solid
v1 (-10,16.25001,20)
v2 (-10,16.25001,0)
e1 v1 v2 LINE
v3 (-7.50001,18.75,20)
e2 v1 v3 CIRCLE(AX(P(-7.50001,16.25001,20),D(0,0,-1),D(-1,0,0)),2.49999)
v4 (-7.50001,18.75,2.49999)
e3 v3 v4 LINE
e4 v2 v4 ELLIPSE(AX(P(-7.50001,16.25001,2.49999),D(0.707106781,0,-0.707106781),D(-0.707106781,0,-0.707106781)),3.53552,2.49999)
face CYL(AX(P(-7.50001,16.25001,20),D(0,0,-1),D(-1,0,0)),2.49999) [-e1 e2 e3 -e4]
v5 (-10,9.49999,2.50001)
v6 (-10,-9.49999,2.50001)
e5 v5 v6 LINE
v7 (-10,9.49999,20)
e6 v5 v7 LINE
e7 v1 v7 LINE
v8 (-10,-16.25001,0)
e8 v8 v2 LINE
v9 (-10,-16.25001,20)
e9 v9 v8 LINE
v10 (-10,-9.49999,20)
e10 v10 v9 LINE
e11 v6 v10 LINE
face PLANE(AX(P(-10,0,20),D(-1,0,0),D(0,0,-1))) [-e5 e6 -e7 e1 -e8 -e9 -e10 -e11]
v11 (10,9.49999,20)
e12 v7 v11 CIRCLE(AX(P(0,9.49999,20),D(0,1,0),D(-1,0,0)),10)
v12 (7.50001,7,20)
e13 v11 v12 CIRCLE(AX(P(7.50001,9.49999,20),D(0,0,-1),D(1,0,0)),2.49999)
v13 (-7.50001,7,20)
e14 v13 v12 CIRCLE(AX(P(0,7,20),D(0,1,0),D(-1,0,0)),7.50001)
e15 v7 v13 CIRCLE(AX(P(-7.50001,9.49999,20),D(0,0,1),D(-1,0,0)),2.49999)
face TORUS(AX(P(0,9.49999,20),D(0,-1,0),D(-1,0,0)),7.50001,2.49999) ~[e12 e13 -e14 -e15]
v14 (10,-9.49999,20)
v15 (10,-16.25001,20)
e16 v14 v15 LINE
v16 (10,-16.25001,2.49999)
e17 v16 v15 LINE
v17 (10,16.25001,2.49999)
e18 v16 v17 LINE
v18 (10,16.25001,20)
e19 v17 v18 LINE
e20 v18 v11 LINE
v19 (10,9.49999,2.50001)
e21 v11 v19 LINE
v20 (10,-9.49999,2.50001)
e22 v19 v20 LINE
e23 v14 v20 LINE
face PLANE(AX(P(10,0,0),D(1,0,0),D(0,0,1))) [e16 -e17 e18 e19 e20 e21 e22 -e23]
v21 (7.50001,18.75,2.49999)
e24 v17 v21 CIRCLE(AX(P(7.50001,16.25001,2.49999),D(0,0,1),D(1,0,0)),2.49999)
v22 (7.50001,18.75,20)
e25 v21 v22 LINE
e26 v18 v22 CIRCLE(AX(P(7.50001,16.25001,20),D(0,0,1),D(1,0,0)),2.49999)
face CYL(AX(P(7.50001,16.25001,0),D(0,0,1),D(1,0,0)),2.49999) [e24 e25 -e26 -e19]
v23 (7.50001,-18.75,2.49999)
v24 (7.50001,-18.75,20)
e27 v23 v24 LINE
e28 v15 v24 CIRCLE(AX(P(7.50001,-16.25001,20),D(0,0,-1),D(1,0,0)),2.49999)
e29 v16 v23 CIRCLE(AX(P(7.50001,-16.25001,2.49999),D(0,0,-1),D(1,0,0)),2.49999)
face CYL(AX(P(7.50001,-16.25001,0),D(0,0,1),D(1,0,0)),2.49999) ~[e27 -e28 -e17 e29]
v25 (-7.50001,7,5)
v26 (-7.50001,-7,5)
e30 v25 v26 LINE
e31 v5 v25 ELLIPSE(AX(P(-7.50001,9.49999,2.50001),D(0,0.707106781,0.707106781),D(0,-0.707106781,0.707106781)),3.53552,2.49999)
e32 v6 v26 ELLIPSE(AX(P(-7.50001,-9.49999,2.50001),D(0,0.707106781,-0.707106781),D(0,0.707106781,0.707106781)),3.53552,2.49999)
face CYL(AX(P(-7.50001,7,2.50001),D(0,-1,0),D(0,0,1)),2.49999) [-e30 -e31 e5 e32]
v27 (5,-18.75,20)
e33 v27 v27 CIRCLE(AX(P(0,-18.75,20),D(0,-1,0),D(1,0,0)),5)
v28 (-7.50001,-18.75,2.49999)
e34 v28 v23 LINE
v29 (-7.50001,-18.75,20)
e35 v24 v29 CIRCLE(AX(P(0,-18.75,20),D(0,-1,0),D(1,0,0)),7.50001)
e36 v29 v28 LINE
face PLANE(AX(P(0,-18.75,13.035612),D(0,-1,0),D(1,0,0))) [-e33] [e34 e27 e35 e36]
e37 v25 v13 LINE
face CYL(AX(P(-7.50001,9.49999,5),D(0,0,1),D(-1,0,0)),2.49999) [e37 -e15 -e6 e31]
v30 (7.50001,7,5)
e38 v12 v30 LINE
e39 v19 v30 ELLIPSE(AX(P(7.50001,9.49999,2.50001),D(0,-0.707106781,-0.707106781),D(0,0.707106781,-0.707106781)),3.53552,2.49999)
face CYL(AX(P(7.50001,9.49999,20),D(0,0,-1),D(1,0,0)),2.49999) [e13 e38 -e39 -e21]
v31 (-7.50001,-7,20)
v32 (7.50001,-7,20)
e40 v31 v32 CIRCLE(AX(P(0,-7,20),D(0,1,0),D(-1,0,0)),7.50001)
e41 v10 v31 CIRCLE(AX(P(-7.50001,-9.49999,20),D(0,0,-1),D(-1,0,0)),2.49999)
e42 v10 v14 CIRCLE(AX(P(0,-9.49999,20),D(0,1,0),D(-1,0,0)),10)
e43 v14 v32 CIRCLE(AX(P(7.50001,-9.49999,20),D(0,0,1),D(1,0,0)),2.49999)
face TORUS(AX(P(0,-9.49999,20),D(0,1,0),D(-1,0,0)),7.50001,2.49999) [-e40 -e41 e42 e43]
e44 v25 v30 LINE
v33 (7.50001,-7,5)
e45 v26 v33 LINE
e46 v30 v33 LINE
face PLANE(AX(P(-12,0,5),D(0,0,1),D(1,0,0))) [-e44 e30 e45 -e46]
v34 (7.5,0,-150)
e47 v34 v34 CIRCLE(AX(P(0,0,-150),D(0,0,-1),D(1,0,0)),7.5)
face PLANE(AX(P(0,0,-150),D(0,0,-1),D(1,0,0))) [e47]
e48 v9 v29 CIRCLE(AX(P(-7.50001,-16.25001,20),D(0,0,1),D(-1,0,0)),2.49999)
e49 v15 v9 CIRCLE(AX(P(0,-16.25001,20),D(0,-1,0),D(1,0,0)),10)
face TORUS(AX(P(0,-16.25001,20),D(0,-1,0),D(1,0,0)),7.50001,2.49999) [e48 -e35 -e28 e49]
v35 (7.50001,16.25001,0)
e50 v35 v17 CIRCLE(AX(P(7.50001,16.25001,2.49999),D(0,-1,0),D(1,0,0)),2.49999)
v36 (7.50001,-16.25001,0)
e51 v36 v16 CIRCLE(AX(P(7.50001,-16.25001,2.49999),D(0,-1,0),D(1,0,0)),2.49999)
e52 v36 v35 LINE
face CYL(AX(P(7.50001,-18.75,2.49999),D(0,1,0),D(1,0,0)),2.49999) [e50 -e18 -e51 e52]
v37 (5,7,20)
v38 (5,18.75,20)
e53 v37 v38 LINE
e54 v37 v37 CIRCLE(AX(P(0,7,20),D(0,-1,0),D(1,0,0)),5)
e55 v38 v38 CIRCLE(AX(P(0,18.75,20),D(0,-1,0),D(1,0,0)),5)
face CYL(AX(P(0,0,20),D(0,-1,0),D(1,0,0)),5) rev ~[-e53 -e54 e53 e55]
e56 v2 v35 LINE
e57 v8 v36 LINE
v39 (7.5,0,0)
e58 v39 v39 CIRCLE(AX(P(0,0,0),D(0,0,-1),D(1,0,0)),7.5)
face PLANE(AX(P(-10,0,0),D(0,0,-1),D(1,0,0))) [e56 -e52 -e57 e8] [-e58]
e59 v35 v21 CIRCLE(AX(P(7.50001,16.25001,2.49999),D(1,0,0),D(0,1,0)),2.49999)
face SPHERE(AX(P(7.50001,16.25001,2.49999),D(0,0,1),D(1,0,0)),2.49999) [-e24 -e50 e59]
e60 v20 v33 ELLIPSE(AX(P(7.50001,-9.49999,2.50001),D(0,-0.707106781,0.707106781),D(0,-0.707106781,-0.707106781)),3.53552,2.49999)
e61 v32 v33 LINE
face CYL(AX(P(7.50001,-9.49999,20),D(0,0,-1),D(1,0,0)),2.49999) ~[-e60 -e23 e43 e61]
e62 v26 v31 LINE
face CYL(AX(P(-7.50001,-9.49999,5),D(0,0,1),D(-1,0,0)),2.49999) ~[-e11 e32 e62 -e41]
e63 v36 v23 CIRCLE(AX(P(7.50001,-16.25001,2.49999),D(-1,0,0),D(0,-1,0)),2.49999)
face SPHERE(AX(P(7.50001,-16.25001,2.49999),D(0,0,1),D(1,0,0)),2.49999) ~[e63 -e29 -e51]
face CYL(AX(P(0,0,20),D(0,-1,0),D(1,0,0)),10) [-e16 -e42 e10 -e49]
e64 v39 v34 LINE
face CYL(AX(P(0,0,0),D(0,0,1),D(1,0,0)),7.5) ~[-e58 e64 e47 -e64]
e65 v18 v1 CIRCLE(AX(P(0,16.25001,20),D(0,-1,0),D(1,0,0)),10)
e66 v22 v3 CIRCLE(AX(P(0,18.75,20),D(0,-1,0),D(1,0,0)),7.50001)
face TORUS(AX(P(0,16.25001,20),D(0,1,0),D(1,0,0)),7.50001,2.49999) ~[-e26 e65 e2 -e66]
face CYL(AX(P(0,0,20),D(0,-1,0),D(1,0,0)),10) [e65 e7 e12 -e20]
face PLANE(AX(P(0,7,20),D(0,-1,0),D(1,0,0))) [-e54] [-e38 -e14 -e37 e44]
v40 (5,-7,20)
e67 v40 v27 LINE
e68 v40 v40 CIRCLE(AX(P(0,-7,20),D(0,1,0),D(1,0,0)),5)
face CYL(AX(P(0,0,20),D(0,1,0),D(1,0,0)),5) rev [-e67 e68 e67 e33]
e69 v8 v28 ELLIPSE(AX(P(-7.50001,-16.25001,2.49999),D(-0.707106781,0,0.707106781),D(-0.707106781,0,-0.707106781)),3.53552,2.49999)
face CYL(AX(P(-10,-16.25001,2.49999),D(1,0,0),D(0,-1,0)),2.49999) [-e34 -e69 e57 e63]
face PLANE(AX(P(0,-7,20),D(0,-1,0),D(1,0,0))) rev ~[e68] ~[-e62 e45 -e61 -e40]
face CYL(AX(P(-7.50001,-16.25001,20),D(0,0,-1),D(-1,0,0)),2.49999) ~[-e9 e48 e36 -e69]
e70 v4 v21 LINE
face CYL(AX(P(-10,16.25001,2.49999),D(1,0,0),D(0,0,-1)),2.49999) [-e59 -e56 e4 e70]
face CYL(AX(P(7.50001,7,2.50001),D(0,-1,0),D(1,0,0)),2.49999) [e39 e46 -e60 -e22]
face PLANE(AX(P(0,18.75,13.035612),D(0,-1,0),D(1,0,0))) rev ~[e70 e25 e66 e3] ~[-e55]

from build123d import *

# Parameters (mm, degrees)
F0_R          = 5
F1_DEPTH      = 18.75
F1_DEPTH_BACK = 18.75
F4_DEPTH      = 7
F4_DEPTH_BACK = 7
F6_R          = 7.5
F7_DEPTH      = 150
F8_R          = 2.49999


# Not quite as in the source:
# - a fillet or chamfer is up to 0.001 mm smaller than in the source, because OpenCascade refuses the exact size
# - a feature names something its author has since deleted; it is built from what else it names


with BuildPart() as f1:
    # F0 (on Front) → F1 (new body, two sides)
    with BuildSketch(Plane.XZ) as f1_sk:
        with BuildLine():
            Line((10, 0), (10, 20))
            ThreePointArc((10, 20), (0, 30), (-10, 20))
            Line((-10, 20), (-10, 0))
            Line((-10, 0), (10, 0))
        make_face()
        with Locations((0, 20)):
            Circle(F0_R, mode=Mode.SUBTRACT)
    extrude(amount=F1_DEPTH)
    extrude(f1_sk.sketch, amount=-F1_DEPTH_BACK)

    # F3 (on offset) → F4 (cut, two sides)
    with BuildSketch(Plane.XZ) as f4_sk:
        Polygon((-12, 5), (0, 5), (12, 5), (12, 35), (-12, 35), align=None)
    extrude(amount=-F4_DEPTH, mode=Mode.SUBTRACT)
    extrude(f4_sk.sketch, amount=F4_DEPTH_BACK, mode=Mode.SUBTRACT)

    # F6 (on offset) → F7 (join)
    with BuildSketch(Plane(origin=(0, 0, 0), x_dir=(1, 0, 0), z_dir=(0, 0, -1))):
        Circle(F6_R)
    extrude(amount=F7_DEPTH)

    # F8 (radius 2.5 in the source; OpenCascade refuses exactly that, so slightly less here)
    f8_edges = [f1.edges().sort_by_distance(p)[0] for p in [
        (10, -7, 12.5),
        (10, 7, 12.5),
        (10, 18.75, 10),
        (10, -18.75, 10),
        (10, 0, 5),
        (-10, 0, 5),
        (10, 0, 0),
        (0, 18.75, 0),
        (0, -18.75, 0),
    ]]
    fillet(f8_edges, radius=F8_R)


solid = f1.part
